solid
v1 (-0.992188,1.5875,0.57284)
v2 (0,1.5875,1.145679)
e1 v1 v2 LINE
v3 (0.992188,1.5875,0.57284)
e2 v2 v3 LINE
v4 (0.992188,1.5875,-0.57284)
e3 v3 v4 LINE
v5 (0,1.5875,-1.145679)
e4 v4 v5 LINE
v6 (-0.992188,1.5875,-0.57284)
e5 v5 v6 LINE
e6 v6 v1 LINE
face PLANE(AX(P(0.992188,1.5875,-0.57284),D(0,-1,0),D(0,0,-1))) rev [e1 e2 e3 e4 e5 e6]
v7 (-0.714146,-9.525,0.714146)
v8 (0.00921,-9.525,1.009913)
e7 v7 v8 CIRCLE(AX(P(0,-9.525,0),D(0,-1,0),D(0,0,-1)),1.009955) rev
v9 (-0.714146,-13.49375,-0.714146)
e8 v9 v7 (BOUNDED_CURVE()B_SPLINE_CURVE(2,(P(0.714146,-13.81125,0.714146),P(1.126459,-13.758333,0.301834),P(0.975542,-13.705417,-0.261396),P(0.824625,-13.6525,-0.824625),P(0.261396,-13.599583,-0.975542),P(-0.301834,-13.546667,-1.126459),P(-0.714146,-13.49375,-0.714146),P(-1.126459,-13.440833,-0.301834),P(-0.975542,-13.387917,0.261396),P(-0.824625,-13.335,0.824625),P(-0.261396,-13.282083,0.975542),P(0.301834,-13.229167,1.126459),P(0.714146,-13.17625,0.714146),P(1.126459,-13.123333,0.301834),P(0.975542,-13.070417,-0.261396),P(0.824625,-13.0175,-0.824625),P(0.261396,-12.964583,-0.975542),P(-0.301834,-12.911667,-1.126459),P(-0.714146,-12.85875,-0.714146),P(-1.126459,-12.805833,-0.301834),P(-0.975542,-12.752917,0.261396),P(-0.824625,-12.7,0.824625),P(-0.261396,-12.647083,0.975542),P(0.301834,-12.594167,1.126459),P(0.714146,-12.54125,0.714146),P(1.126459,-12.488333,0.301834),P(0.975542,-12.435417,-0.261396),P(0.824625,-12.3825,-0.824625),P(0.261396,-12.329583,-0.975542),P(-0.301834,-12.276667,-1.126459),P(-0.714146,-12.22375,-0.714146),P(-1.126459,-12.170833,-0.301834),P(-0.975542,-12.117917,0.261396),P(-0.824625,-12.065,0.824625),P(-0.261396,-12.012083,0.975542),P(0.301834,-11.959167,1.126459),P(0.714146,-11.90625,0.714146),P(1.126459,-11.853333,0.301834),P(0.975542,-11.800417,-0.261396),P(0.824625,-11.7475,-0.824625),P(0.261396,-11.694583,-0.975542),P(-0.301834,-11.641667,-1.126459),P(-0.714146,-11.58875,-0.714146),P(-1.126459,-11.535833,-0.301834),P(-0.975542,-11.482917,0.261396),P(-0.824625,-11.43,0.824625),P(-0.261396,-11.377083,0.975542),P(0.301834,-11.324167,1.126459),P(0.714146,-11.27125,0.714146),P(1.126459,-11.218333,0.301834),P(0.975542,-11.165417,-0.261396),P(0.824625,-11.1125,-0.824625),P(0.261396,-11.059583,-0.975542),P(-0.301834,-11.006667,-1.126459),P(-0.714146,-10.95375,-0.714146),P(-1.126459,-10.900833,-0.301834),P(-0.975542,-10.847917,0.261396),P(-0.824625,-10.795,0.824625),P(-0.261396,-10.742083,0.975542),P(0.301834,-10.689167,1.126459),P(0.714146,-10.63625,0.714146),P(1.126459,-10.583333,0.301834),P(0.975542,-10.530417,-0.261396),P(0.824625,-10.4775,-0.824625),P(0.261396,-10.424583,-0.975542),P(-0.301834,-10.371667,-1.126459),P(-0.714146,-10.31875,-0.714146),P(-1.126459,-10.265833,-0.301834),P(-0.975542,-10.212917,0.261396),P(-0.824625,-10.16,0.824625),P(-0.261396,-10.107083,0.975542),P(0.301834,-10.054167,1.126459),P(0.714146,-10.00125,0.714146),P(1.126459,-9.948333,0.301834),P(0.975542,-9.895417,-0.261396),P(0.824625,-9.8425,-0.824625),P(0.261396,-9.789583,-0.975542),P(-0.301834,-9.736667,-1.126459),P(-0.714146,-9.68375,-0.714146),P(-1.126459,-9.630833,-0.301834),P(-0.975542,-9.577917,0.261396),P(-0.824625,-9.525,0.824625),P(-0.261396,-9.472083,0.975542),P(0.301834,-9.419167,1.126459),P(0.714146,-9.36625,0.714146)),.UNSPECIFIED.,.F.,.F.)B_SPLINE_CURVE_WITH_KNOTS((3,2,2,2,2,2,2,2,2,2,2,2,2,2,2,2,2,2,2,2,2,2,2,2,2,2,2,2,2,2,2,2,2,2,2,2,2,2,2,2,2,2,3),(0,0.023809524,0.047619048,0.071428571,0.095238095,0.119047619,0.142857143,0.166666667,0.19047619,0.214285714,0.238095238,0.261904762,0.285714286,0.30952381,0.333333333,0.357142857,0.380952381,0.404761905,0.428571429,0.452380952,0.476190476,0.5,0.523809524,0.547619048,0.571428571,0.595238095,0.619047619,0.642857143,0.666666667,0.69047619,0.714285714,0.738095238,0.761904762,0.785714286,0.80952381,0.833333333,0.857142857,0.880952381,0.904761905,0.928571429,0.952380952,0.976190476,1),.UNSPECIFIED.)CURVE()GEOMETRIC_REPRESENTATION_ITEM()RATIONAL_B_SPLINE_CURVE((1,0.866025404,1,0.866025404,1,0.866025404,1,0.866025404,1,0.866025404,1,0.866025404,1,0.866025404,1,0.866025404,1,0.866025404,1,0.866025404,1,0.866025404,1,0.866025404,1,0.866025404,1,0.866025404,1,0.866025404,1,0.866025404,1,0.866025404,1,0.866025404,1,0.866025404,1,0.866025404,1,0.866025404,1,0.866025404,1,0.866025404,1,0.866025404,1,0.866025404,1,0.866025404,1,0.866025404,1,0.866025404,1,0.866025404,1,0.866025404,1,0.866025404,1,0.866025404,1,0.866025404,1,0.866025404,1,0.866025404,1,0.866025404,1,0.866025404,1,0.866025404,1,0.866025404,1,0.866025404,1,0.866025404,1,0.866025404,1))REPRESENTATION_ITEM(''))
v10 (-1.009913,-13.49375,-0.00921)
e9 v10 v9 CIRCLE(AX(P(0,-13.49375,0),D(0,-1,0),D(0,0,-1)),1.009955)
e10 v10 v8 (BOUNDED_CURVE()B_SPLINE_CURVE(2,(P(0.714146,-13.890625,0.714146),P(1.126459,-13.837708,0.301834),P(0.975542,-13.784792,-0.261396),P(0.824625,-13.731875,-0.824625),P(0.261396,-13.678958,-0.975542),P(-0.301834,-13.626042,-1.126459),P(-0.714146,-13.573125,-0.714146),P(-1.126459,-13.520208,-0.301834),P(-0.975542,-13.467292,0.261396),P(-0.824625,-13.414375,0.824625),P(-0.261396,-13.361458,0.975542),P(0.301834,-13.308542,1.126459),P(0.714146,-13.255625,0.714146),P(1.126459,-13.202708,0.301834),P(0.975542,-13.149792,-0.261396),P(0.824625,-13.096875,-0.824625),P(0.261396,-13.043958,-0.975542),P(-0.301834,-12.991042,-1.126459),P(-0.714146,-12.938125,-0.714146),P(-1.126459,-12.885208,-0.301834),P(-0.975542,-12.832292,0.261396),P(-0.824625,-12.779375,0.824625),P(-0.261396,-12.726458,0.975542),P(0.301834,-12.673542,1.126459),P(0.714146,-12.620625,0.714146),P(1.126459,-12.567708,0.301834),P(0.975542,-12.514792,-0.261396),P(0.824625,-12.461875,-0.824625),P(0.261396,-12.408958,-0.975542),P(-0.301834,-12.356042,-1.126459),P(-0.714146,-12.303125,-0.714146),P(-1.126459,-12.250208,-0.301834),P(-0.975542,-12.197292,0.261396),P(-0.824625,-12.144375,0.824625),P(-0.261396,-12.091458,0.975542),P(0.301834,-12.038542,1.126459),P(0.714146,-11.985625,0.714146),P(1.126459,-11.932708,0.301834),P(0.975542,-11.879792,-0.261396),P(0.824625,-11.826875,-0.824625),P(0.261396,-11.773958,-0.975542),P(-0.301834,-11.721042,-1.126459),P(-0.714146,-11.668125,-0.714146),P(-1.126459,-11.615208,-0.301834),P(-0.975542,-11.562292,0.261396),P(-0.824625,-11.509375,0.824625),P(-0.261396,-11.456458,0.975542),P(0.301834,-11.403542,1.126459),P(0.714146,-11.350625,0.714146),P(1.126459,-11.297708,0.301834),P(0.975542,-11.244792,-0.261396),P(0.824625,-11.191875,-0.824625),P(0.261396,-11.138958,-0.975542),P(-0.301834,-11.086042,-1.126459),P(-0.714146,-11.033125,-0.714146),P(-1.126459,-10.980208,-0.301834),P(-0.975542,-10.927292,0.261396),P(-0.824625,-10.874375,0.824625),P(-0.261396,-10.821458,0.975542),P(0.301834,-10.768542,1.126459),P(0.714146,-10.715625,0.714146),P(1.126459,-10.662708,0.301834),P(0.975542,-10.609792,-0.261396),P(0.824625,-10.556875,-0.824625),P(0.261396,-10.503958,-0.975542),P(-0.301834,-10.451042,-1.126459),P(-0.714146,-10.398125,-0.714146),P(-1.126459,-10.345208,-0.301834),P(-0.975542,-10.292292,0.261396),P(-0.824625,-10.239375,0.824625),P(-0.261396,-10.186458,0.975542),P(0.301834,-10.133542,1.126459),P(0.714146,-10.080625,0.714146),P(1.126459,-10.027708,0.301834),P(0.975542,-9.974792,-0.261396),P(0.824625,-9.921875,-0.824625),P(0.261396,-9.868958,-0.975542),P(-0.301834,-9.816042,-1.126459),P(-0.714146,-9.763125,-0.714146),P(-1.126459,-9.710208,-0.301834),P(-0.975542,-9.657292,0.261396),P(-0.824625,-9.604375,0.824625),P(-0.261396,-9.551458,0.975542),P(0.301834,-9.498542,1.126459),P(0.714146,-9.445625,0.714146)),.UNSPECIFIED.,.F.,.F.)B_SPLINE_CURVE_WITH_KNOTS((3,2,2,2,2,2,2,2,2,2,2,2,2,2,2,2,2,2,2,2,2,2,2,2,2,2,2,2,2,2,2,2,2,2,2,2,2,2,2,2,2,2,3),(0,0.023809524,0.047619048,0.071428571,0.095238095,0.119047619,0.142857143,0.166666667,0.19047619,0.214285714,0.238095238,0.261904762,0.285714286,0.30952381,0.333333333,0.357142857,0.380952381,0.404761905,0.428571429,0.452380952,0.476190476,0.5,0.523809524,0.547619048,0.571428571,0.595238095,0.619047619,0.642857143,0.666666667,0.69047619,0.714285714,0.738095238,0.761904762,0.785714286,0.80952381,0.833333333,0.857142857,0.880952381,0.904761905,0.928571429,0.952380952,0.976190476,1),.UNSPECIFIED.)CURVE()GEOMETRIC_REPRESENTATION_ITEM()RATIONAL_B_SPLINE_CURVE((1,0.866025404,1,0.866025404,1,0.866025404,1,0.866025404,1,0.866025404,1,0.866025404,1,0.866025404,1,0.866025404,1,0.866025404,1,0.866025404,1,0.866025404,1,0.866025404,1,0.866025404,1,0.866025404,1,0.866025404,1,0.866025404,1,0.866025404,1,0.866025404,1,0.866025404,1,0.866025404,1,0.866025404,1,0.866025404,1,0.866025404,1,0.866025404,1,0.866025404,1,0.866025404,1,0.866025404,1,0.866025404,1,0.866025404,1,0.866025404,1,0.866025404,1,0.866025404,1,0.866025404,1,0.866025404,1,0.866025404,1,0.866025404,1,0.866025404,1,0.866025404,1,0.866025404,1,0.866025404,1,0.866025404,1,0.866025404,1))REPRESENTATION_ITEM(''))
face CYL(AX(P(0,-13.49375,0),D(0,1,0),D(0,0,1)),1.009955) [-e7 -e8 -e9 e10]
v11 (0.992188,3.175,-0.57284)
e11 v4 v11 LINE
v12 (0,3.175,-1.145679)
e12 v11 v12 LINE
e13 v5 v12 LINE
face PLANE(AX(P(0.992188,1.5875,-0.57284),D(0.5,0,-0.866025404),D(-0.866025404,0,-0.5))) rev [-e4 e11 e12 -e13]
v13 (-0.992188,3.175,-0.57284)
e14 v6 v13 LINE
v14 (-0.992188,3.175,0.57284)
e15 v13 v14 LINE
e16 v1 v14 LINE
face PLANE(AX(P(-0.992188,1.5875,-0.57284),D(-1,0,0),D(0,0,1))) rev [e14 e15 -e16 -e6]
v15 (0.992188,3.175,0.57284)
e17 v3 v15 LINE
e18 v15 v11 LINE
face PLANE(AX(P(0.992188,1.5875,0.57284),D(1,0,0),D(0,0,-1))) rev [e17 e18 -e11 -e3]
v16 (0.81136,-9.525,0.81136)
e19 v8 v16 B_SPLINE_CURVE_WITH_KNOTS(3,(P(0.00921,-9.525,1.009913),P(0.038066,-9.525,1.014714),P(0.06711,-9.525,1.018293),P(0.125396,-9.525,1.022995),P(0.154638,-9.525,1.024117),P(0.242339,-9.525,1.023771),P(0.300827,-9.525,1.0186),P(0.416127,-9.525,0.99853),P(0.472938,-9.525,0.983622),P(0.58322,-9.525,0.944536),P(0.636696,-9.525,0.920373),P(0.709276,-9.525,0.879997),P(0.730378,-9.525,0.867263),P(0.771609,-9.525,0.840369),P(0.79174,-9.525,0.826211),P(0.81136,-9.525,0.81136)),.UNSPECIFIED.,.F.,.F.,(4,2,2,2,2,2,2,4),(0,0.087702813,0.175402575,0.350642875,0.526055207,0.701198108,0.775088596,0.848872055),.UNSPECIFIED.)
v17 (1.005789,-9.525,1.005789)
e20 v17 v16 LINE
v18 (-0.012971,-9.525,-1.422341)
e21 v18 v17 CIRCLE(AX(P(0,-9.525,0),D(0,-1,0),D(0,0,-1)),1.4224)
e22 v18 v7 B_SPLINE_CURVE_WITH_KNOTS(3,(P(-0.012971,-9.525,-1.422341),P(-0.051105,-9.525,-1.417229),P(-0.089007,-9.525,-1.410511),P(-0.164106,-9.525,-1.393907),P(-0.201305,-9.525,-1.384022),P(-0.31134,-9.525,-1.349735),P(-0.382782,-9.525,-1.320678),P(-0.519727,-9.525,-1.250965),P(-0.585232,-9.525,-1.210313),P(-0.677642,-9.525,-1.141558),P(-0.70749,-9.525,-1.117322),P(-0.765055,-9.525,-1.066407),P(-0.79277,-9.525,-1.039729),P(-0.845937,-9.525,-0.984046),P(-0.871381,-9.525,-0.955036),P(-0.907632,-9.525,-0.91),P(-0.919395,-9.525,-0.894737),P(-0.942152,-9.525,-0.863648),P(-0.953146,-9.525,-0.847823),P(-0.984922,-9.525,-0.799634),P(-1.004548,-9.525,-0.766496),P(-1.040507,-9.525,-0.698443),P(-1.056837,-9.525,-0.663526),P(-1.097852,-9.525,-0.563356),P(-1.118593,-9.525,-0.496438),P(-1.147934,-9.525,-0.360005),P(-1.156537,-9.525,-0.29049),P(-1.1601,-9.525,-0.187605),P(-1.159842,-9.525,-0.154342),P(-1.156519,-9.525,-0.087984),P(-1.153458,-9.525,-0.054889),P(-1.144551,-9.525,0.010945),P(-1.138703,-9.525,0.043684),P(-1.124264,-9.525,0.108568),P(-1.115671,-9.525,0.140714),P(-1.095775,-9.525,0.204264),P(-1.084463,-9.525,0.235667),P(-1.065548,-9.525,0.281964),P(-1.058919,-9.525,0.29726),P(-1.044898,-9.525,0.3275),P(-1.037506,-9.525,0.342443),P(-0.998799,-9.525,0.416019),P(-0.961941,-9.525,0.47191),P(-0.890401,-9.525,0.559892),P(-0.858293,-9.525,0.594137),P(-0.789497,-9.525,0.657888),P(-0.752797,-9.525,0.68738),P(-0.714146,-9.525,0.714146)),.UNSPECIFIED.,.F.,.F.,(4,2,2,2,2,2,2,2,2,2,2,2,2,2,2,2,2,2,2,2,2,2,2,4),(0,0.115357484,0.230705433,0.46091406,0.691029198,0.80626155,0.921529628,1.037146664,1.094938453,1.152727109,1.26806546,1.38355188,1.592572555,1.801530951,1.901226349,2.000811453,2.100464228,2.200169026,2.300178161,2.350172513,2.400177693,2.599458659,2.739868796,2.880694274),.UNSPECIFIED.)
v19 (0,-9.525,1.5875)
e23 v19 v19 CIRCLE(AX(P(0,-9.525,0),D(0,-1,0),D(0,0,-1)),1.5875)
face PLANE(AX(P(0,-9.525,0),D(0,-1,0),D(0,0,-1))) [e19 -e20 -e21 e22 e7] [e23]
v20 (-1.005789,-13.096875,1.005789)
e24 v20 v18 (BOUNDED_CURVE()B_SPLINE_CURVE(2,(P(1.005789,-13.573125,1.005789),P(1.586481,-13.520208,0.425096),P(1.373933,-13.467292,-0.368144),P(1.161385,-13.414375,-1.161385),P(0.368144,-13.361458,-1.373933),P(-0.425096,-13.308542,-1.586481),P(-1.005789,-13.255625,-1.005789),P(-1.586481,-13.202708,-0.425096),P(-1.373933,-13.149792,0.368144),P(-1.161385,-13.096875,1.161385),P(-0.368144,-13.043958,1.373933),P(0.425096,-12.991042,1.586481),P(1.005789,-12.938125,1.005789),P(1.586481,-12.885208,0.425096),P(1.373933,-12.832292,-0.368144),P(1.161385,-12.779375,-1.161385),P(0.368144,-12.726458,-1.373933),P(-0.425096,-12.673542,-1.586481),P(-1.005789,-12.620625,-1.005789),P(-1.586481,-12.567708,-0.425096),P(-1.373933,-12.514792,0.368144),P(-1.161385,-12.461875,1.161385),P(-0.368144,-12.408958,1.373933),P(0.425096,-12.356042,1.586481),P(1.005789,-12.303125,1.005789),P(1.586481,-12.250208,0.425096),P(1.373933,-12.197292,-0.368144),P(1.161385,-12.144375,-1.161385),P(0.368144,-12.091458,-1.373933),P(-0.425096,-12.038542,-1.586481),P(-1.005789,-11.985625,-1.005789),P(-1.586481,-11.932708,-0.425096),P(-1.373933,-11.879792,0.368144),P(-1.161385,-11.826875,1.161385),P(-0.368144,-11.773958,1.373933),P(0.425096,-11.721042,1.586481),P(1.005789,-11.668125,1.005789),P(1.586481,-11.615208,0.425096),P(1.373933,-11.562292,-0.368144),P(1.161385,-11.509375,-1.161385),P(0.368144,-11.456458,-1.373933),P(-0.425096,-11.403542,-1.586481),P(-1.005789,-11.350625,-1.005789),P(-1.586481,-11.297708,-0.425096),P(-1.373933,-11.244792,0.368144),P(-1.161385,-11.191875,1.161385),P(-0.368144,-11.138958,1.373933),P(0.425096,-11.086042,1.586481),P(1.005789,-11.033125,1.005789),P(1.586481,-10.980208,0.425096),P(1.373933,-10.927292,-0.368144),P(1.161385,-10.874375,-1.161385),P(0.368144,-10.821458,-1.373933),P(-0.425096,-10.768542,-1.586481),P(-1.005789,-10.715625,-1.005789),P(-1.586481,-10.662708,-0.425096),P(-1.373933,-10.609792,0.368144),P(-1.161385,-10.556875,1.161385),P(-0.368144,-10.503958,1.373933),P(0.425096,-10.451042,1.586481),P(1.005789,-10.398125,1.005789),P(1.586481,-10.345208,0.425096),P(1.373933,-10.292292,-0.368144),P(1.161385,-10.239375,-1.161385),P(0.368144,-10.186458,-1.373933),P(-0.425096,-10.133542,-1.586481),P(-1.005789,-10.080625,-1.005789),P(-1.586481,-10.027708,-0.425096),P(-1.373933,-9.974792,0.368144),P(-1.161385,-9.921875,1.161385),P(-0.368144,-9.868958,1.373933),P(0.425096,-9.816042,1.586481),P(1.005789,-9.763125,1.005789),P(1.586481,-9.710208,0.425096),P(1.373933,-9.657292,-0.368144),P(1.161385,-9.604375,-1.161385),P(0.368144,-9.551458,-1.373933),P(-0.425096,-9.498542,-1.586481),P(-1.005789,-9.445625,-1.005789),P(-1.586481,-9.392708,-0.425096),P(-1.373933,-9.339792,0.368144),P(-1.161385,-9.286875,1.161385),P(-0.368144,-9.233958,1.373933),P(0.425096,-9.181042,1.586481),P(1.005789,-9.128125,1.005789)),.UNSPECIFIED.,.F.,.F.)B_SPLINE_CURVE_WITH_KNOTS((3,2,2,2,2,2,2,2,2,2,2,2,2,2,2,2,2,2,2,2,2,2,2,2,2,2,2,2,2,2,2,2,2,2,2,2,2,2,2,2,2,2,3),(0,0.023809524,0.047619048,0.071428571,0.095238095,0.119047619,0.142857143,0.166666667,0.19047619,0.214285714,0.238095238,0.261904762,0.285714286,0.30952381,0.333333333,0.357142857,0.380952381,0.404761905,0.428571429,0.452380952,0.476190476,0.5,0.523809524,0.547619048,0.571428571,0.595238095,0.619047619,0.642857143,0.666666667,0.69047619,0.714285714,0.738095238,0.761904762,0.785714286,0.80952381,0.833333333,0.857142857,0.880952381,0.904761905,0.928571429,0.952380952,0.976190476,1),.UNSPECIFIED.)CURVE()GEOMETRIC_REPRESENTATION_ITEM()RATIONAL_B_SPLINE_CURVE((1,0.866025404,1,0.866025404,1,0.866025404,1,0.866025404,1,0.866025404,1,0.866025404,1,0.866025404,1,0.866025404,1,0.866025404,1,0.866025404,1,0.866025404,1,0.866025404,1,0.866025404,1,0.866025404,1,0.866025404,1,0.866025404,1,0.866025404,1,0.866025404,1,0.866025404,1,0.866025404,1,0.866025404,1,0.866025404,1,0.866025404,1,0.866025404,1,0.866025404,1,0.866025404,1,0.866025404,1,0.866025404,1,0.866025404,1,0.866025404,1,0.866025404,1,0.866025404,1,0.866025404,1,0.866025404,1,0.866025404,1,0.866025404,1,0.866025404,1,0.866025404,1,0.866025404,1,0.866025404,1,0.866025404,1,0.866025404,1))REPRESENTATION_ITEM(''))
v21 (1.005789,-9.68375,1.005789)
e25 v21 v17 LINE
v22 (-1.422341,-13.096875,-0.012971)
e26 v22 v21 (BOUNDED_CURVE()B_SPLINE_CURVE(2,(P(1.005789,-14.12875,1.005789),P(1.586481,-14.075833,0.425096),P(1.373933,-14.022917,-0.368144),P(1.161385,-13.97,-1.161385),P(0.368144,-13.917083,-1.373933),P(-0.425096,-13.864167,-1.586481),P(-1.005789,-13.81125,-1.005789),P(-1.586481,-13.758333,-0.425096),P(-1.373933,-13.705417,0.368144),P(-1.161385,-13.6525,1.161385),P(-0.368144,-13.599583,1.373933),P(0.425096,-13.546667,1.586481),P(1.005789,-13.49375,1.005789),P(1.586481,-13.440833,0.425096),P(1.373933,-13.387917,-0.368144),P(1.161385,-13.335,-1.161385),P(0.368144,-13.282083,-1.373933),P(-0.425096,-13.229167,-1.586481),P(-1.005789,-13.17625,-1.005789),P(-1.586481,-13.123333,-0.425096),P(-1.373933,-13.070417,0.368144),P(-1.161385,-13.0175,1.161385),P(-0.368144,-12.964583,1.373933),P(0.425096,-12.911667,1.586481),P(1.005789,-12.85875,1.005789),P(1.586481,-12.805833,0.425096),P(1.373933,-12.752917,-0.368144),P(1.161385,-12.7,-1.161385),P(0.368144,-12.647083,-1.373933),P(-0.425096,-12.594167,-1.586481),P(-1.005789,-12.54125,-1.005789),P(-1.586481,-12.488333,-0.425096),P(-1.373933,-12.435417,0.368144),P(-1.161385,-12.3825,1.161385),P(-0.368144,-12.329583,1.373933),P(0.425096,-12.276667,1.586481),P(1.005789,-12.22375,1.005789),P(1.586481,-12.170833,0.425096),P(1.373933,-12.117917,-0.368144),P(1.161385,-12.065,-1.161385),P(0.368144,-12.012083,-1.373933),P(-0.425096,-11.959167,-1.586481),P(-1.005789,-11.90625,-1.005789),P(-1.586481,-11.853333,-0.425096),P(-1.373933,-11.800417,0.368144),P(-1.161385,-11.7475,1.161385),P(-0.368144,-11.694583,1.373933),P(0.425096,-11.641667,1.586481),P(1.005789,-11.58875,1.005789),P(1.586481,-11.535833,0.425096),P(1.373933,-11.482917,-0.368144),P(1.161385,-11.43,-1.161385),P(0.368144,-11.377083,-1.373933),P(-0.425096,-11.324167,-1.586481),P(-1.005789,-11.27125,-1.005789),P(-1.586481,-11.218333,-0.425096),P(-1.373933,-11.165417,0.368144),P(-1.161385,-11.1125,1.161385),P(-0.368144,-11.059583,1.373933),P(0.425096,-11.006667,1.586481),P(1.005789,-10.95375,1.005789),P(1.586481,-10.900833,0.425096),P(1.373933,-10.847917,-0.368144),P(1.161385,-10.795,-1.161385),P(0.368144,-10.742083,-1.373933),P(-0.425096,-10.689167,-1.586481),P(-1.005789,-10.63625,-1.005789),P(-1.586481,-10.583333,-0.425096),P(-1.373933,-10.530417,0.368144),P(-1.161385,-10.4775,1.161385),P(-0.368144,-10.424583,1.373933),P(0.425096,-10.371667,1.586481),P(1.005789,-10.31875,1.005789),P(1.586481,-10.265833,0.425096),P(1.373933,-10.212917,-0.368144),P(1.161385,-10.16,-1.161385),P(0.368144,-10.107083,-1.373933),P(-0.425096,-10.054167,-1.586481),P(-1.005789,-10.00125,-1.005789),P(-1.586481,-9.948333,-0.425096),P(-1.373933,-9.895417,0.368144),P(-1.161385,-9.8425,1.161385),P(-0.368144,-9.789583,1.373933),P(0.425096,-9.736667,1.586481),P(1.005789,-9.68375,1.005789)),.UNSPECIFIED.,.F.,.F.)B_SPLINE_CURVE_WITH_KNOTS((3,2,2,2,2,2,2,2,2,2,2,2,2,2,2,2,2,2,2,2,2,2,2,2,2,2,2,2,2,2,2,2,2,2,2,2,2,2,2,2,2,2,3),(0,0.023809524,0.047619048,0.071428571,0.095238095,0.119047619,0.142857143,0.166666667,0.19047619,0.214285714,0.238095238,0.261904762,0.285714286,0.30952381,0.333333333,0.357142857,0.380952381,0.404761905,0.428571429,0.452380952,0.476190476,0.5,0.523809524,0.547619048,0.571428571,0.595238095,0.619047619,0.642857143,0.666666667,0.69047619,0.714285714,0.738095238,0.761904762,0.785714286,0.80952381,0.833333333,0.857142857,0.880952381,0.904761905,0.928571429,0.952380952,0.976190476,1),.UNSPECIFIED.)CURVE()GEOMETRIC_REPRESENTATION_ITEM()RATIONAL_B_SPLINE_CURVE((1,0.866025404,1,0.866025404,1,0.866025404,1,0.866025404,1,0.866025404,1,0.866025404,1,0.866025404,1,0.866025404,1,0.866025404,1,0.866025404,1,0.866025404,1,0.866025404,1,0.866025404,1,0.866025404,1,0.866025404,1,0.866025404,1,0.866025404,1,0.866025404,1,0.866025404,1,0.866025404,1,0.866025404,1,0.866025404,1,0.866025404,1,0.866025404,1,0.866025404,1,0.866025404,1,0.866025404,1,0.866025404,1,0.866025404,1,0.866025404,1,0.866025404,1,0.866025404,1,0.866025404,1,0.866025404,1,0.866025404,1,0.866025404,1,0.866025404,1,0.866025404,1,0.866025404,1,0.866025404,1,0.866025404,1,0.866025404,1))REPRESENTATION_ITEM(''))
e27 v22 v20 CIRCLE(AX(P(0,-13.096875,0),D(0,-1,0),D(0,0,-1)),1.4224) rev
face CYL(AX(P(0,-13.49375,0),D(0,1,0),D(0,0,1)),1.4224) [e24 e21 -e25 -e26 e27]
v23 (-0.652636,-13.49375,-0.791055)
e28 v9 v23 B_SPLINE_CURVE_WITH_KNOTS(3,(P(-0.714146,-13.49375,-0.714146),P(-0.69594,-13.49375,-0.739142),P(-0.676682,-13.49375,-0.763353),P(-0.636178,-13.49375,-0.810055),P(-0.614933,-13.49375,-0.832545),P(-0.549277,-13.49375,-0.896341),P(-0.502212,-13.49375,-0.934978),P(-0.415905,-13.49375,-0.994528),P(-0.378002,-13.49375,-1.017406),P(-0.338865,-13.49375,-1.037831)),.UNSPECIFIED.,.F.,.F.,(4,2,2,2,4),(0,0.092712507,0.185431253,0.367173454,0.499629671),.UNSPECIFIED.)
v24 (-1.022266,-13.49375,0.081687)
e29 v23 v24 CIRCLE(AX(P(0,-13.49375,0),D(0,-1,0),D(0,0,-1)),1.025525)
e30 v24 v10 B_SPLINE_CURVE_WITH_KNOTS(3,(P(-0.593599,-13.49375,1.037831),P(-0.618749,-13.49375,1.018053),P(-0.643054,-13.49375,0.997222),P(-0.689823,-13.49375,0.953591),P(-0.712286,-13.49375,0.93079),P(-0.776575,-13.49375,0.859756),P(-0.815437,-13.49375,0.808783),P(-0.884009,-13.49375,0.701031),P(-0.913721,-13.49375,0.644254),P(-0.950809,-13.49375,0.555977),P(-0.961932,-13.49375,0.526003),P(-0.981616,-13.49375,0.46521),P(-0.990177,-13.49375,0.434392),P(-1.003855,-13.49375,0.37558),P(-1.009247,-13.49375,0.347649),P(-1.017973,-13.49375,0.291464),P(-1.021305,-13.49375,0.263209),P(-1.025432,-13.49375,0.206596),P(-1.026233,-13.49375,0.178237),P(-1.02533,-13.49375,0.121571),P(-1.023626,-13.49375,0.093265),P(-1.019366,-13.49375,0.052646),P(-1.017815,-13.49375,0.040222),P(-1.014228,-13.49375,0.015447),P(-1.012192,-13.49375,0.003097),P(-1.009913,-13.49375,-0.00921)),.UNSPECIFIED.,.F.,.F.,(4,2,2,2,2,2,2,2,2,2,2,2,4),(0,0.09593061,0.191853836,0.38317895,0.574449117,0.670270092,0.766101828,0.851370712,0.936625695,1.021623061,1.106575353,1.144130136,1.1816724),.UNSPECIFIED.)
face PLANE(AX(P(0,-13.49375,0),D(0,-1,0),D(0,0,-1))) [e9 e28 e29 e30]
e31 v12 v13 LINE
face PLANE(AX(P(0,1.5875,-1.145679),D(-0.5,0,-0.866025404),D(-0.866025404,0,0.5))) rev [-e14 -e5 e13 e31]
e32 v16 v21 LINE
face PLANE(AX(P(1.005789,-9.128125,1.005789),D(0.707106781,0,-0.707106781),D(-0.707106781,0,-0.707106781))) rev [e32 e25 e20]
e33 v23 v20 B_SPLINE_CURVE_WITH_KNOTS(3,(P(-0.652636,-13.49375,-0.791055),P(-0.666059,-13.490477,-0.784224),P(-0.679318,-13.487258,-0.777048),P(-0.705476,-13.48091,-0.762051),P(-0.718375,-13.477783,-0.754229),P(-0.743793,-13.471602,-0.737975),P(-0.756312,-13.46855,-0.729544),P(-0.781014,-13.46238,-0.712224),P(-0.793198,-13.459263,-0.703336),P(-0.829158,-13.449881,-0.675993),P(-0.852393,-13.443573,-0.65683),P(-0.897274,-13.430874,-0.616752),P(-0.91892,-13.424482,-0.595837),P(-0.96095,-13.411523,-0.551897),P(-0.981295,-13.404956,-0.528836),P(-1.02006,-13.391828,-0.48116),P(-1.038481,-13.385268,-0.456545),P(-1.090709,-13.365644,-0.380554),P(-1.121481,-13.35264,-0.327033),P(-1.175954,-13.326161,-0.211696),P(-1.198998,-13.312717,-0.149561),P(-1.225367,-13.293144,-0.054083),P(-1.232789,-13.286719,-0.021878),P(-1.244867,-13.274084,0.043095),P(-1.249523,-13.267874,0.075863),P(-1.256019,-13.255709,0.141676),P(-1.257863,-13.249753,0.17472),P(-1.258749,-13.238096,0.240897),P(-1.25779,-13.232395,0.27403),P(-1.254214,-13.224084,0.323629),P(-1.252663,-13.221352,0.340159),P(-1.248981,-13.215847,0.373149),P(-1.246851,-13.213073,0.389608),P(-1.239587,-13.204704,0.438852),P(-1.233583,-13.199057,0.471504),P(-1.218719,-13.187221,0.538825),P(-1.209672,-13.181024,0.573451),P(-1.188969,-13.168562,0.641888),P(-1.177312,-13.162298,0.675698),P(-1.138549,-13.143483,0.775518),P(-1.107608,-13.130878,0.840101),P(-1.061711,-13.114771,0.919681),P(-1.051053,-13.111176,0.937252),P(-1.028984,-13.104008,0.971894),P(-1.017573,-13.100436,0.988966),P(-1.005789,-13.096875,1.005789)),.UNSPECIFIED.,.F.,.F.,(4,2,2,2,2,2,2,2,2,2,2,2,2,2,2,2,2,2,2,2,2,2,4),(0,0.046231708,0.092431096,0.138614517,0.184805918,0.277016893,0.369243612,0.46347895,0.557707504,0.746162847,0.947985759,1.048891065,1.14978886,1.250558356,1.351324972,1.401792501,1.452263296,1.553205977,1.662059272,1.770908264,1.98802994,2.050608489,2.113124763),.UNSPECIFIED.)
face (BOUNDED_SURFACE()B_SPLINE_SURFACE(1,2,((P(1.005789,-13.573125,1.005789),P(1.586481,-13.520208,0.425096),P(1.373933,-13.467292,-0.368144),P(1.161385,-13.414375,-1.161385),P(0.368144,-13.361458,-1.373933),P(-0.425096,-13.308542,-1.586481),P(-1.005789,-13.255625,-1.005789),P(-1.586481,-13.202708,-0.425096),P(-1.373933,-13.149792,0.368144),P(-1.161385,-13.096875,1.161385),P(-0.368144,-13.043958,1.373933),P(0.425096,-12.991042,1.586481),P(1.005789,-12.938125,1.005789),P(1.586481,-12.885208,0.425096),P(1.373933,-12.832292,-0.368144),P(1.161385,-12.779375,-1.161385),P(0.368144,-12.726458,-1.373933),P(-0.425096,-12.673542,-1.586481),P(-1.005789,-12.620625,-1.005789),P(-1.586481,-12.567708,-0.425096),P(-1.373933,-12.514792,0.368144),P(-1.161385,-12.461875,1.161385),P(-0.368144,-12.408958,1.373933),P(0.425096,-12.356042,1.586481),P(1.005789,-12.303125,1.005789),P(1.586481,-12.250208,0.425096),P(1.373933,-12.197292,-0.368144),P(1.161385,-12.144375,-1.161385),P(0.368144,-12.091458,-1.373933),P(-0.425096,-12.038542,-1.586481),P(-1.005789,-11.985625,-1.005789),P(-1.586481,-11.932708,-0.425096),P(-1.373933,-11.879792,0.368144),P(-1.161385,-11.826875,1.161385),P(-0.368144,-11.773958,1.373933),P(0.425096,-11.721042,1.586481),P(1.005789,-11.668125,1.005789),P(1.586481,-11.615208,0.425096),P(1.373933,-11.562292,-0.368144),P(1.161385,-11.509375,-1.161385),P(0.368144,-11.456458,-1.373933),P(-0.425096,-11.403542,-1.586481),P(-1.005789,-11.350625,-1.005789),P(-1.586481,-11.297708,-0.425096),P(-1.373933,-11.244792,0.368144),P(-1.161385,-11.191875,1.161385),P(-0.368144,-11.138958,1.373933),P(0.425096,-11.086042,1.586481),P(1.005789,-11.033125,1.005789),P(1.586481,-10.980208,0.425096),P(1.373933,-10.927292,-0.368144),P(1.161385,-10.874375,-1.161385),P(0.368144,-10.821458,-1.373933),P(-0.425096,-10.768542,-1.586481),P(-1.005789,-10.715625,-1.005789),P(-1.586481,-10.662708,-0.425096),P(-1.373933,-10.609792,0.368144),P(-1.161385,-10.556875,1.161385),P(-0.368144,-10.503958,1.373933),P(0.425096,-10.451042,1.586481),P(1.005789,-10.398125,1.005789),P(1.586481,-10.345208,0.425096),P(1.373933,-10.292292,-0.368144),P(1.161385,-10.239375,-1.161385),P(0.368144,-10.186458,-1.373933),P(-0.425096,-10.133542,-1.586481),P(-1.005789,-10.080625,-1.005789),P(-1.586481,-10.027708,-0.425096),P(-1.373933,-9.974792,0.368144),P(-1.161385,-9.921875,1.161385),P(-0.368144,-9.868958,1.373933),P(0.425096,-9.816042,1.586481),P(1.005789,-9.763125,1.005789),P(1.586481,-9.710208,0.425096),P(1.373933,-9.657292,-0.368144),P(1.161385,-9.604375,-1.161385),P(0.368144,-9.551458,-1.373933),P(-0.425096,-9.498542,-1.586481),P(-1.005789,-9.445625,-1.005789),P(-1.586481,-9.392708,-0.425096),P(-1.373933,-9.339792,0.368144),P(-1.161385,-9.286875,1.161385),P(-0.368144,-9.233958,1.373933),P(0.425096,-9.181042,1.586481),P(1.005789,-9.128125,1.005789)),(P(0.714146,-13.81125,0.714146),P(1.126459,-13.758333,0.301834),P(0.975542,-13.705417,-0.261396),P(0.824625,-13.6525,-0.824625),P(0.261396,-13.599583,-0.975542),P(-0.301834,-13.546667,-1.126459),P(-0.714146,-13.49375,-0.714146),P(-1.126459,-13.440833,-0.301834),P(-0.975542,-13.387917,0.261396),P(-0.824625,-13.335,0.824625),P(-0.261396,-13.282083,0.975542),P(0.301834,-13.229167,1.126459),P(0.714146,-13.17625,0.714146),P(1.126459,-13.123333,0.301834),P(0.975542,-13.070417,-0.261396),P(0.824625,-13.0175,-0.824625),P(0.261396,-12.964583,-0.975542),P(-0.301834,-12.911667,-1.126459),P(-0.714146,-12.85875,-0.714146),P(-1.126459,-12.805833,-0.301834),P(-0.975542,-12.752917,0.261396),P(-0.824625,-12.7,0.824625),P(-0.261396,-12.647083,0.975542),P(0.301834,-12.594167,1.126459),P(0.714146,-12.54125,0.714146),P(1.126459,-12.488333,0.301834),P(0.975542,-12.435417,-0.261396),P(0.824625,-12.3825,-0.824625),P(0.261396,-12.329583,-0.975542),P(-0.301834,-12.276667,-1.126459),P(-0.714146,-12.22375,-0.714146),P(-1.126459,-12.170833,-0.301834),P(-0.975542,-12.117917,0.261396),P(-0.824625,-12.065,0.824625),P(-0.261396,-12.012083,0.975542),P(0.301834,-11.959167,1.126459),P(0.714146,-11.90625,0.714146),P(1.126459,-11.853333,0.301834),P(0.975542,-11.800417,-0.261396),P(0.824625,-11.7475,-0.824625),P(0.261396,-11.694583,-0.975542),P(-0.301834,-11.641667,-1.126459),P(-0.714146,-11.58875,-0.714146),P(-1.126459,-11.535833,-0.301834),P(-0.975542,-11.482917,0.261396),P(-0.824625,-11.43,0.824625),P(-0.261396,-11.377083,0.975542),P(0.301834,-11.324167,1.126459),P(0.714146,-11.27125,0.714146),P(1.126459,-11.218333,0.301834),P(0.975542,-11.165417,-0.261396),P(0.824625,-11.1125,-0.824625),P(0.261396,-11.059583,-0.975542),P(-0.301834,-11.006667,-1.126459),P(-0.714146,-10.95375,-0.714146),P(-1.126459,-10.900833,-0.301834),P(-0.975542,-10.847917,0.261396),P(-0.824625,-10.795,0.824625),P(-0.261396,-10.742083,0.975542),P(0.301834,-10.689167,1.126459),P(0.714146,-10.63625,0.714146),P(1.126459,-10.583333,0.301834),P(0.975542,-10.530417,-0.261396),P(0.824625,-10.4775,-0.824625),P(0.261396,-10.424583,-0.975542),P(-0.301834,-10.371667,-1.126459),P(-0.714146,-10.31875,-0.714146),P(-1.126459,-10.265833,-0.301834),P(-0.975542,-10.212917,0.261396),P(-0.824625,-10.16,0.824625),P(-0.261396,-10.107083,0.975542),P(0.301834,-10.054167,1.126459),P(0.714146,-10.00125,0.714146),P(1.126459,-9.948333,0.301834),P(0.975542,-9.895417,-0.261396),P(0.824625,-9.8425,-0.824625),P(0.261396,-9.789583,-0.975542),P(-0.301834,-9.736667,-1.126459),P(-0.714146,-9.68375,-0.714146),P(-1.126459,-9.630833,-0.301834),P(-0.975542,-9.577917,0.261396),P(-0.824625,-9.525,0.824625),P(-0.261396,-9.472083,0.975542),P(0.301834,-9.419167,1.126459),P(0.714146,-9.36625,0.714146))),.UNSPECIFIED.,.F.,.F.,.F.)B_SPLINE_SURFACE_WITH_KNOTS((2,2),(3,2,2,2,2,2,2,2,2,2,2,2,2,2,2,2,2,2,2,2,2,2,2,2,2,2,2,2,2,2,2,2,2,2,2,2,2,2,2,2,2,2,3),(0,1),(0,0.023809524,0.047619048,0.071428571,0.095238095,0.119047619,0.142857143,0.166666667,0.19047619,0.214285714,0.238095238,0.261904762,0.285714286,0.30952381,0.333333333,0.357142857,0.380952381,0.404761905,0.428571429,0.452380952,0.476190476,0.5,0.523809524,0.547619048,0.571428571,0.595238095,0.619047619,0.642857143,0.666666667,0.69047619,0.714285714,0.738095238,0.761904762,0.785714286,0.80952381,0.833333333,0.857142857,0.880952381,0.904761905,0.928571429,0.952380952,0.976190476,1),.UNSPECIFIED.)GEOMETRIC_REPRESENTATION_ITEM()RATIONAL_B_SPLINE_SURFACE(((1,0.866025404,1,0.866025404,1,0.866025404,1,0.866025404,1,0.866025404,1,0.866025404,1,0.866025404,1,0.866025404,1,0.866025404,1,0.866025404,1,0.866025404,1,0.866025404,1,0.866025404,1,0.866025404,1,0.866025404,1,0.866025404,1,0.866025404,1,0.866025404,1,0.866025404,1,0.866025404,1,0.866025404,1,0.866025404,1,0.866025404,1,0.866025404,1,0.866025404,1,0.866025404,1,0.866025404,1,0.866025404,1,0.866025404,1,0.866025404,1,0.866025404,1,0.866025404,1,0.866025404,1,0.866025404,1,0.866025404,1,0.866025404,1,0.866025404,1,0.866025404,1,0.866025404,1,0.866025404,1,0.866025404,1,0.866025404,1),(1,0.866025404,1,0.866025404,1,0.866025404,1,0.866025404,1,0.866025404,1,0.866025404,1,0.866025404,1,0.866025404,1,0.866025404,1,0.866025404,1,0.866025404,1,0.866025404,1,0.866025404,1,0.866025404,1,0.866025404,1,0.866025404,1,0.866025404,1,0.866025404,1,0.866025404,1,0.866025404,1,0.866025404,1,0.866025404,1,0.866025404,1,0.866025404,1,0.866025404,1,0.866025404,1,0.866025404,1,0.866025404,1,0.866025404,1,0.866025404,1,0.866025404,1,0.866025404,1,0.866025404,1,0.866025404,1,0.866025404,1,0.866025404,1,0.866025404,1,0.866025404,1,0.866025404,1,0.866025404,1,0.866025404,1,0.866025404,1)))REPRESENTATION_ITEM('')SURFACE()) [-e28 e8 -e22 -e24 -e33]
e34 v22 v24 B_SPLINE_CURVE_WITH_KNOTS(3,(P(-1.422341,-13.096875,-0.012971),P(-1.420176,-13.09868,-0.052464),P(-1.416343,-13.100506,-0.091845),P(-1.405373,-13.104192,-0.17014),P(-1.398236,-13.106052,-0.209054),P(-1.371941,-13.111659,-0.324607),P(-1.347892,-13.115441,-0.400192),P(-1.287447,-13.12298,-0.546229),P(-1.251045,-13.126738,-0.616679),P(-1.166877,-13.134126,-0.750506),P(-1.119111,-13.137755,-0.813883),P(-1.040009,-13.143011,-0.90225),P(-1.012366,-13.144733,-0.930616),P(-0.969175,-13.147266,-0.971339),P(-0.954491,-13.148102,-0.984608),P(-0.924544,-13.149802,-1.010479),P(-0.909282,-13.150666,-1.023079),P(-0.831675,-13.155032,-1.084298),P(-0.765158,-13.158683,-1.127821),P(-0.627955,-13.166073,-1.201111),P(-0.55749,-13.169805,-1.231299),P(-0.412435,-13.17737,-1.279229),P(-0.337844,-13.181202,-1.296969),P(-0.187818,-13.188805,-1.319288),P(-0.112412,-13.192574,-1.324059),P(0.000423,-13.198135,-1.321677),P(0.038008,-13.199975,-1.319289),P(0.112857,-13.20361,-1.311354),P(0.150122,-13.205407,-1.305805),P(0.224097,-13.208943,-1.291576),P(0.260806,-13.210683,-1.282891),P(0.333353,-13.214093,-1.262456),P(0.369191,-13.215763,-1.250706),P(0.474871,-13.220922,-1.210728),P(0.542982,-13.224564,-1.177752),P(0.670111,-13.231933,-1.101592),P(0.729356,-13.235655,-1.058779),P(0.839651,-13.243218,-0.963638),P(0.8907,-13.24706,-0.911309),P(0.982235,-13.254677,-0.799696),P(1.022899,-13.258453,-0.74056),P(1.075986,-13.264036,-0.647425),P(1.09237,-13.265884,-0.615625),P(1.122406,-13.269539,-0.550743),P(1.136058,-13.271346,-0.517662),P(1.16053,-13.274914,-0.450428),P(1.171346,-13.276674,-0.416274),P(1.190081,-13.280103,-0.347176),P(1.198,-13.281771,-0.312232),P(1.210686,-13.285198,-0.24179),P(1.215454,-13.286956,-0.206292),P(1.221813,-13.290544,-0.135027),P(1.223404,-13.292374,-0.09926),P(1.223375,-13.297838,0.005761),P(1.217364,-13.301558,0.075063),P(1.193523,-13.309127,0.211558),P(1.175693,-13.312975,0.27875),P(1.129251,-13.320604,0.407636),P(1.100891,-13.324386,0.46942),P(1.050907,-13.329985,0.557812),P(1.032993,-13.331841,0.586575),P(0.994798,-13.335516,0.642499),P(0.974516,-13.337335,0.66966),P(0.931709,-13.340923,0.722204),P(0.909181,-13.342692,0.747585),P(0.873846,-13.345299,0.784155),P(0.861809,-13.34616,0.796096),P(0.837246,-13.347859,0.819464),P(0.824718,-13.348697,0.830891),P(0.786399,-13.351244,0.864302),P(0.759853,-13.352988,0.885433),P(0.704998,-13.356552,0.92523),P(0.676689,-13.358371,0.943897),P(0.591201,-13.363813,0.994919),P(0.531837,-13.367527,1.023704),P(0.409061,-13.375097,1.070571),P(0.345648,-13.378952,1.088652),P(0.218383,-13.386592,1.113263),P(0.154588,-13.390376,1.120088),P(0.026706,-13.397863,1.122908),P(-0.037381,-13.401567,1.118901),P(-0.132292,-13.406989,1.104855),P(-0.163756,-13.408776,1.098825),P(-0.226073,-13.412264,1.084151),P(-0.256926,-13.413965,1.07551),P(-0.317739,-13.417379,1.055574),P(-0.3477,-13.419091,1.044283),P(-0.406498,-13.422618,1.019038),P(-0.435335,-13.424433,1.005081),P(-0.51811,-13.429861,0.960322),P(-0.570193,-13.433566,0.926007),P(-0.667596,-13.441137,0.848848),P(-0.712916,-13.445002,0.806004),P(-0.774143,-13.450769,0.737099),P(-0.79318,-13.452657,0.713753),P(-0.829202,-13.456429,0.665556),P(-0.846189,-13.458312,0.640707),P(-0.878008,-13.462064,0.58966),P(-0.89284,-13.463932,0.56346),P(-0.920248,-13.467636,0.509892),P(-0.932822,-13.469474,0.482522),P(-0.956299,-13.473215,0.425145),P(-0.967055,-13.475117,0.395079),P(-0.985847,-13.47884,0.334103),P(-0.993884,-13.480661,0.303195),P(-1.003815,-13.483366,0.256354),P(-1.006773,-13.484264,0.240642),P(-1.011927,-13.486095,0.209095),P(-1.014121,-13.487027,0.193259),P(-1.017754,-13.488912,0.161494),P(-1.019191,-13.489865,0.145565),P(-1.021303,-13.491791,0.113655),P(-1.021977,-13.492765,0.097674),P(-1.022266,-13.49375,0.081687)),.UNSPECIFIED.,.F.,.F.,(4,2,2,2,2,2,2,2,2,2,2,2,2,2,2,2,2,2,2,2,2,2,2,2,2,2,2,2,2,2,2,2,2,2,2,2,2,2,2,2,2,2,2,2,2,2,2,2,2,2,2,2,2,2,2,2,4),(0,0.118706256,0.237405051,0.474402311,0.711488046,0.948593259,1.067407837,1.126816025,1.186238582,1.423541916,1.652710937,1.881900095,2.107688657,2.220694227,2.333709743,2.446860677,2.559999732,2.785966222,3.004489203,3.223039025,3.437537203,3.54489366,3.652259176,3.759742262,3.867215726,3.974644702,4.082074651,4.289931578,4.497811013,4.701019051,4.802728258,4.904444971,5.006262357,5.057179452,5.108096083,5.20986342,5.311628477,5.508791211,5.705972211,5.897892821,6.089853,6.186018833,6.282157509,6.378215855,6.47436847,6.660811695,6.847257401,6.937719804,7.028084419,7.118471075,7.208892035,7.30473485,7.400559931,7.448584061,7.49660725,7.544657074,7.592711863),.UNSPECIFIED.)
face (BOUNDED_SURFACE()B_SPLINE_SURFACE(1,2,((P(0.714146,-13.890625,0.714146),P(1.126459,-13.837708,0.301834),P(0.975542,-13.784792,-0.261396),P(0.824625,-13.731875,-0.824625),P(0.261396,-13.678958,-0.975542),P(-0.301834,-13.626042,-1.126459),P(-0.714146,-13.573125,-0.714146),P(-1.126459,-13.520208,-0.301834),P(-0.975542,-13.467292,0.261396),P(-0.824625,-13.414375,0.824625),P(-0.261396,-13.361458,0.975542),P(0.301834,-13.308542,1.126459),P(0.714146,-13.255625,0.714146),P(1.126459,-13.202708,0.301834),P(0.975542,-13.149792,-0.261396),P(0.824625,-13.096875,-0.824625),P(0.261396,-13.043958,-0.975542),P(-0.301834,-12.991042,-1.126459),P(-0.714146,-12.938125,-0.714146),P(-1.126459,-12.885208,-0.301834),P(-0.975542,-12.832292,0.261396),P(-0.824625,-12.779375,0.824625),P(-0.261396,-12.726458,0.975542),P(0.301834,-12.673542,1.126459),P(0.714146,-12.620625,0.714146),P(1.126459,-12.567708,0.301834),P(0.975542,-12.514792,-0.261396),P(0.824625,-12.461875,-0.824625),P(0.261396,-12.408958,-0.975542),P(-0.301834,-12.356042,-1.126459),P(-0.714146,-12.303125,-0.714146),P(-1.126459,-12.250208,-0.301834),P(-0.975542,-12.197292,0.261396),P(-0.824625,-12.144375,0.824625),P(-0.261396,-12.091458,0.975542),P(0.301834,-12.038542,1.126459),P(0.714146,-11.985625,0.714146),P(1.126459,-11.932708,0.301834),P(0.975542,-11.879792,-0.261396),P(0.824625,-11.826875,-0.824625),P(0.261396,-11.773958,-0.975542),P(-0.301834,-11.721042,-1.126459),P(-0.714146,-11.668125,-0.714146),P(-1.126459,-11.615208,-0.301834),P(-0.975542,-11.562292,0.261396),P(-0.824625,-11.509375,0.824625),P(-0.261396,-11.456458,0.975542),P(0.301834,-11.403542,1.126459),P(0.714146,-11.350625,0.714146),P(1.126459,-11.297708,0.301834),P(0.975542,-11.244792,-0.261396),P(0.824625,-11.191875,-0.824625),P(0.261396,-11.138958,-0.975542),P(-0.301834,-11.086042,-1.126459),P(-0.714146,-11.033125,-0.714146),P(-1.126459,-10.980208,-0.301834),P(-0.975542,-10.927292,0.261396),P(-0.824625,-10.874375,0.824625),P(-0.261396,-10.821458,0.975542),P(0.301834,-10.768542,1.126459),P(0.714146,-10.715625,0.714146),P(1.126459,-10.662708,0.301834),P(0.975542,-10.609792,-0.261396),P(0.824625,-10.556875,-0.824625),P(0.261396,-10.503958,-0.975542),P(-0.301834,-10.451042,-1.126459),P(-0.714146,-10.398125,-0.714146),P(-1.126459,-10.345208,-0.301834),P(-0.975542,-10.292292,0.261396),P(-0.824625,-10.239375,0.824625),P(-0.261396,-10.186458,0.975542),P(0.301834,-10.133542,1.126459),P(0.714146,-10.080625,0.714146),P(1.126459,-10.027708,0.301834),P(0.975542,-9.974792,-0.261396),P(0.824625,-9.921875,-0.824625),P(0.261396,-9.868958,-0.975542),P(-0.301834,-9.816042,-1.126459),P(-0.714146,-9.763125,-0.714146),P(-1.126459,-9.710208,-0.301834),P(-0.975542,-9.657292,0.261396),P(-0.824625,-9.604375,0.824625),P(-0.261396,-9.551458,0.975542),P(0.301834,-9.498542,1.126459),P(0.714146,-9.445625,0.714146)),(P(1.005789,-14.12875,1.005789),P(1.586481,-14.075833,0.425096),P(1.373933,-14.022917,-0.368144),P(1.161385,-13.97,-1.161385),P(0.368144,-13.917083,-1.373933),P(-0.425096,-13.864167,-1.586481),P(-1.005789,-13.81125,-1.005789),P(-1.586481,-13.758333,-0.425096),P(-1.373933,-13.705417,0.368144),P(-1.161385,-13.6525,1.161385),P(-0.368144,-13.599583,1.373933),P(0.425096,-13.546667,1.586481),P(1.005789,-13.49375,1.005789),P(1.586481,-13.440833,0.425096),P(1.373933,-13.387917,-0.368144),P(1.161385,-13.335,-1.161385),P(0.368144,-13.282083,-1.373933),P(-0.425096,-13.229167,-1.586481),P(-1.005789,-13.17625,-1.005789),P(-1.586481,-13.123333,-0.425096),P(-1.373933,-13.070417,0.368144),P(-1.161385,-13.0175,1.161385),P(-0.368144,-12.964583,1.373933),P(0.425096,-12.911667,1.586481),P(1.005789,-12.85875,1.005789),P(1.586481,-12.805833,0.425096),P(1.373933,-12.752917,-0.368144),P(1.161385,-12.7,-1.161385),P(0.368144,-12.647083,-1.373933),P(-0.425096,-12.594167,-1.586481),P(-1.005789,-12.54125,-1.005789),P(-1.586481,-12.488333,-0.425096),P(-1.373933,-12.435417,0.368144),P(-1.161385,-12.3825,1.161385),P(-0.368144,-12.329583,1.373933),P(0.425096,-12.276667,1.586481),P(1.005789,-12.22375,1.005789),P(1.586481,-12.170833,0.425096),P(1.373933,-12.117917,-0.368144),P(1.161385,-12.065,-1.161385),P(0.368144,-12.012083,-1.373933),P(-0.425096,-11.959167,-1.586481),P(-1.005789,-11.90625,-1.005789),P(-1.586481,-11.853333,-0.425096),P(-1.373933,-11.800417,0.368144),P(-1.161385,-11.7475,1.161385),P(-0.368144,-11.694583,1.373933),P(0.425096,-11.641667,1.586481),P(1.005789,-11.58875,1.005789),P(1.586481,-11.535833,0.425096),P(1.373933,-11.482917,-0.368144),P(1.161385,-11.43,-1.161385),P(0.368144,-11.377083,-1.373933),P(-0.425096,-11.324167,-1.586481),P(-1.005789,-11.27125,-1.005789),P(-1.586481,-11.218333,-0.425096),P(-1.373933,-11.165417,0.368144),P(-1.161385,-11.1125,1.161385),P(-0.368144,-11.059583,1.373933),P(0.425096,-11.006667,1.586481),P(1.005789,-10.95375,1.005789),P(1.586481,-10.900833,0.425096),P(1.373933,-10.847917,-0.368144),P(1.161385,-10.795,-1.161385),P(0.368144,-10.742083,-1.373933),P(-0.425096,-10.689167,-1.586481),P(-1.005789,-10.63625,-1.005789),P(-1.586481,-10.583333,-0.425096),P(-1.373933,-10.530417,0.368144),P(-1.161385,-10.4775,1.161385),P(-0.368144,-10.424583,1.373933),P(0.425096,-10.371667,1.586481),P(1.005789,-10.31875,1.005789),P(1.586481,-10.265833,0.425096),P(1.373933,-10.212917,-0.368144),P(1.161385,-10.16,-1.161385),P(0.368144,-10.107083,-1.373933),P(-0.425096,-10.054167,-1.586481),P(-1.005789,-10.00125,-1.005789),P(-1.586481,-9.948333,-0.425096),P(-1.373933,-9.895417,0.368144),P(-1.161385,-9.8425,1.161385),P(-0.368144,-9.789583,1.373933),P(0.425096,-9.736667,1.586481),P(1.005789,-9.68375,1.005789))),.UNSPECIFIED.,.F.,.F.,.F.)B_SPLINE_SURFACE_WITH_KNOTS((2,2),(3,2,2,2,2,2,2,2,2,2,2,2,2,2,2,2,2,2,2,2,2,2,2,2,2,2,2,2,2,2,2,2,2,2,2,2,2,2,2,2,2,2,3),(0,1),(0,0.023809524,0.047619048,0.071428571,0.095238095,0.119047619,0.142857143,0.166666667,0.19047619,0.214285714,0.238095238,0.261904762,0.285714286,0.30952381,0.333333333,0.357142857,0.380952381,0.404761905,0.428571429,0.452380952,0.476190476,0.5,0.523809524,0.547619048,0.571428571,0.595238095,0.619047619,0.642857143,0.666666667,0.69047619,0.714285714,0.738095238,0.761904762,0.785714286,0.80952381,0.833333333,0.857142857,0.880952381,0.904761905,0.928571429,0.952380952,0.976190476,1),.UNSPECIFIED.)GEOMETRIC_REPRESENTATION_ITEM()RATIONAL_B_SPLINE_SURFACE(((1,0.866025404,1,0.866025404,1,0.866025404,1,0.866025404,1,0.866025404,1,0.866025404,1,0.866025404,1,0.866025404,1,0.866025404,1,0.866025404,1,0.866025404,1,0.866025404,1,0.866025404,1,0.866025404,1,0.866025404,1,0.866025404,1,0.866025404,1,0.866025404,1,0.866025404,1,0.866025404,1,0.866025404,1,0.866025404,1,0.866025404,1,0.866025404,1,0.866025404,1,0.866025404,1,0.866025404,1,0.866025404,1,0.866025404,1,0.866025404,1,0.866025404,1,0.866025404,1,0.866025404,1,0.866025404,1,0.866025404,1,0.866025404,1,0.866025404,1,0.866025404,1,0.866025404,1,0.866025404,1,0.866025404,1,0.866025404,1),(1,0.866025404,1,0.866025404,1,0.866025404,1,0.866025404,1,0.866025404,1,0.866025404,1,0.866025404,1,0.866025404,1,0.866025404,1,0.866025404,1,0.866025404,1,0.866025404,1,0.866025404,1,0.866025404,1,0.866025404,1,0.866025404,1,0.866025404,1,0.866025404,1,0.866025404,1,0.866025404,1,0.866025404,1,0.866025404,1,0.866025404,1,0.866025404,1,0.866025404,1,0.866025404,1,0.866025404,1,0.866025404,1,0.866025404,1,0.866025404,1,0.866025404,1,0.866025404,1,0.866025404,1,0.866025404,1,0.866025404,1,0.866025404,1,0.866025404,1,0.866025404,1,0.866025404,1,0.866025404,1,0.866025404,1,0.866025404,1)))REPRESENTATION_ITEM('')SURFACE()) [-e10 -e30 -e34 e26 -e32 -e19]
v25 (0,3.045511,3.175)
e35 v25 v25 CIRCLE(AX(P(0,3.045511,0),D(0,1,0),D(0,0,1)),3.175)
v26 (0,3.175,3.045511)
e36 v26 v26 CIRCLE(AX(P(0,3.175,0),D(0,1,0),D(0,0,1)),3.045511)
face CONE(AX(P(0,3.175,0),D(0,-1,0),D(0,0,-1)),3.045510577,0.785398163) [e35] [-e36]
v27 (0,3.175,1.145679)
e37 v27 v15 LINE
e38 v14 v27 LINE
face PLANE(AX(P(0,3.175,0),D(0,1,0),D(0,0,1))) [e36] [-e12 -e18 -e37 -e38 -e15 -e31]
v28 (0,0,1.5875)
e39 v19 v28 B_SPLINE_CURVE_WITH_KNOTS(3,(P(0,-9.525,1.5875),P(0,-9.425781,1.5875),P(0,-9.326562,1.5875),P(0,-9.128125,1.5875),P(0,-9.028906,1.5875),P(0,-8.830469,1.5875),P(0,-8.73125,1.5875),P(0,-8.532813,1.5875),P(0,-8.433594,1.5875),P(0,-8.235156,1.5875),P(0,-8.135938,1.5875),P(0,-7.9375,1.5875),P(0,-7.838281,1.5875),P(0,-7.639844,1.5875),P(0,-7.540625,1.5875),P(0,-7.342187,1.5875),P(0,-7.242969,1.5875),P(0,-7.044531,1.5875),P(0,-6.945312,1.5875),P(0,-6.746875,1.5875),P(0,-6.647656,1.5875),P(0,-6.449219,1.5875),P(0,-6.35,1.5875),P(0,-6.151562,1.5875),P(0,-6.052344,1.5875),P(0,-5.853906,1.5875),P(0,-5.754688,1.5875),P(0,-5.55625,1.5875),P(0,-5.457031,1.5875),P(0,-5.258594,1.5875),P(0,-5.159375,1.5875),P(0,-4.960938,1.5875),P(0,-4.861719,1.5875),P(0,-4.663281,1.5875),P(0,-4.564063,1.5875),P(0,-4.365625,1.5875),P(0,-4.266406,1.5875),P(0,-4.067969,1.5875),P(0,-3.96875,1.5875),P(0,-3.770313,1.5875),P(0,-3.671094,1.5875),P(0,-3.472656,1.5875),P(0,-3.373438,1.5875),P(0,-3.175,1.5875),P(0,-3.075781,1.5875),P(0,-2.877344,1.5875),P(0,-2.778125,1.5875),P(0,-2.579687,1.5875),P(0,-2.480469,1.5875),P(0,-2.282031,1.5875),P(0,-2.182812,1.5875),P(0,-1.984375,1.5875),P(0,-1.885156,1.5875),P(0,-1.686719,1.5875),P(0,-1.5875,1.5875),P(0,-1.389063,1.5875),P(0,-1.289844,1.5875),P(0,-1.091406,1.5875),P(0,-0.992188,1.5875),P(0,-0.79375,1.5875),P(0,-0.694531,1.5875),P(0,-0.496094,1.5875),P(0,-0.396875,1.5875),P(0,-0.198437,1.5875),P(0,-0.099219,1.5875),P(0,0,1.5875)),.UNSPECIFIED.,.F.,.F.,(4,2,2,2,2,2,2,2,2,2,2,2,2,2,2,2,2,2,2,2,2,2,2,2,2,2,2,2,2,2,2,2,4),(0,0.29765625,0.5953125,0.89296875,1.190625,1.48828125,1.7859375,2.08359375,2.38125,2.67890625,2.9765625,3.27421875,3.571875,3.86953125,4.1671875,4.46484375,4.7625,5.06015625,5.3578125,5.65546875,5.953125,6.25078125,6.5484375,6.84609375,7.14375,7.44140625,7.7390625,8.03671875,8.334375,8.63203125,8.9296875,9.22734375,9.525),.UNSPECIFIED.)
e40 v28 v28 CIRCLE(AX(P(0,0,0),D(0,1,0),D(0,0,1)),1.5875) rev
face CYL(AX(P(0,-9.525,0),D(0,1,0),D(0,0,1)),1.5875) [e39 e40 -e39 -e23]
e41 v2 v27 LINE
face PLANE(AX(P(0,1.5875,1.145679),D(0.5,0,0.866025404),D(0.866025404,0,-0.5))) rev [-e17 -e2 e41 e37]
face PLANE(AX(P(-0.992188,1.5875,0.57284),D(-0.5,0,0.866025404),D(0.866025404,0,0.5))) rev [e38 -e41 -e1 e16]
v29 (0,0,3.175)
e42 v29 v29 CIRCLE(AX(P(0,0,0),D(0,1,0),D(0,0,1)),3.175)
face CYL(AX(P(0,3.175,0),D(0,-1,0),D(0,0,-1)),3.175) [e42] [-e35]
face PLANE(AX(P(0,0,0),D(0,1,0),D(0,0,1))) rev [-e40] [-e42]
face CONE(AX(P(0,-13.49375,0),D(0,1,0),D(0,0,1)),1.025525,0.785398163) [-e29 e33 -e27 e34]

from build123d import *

# Parameters (mm, degrees)
SKETCH1_R          = 3.175
EXTRUDE1_DEPTH     = 3.175
CUT_EXTRUDE1_DEPTH = 1.5875
SKETCH4_R          = 1.5875
EXTRUDE2_DEPTH     = 9.525
SKETCH5_R          = 1.4224
EXTRUDE3_DEPTH     = 3.96875
CHAMFER1_SIZE      = 0.396875
CUT_SWEEP1_PITCH   = 0.635
CUT_SWEEP1_TO      = 3.96875


with BuildPart() as part:
    # Sketch1 → Extrude1 (new body)
    with BuildSketch(Plane(origin=(0, 0, 0), x_dir=(1, 0, 0), z_dir=(0, 1, 0))):
        with Locations(Location((0, 0, 0), (0, 0, 270))):
            Circle(SKETCH1_R)
    extrude(amount=EXTRUDE1_DEPTH)

    # Sketch2 → Cut-Extrude1 (cut)
    with BuildSketch(Plane(origin=(0, 3.175, 0), x_dir=(-1, 0, 0), z_dir=(0, 1, 0))):
        Polygon((0, -1.14567944), (0.9921875, -0.57283972), (0.9921875, 0.57283972), (0, 1.14567944), (-0.9921875, 0.57283972), (-0.9921875, -0.57283972), align=None)
    extrude(amount=-CUT_EXTRUDE1_DEPTH, mode=Mode.SUBTRACT)

    # Sketch4 → Extrude2 (add)
    with BuildSketch(Plane.XZ):
        with Locations(Location((0, 0, 0), (0, 0, 90))):
            Circle(SKETCH4_R)
    extrude(amount=EXTRUDE2_DEPTH)

    # Sketch5 → Extrude3 (add)
    with BuildSketch(Plane.XZ.offset(9.525)):
        with Locations(Location((0, 0, 0), (0, 0, 270))):
            Circle(SKETCH5_R)
    extrude(amount=EXTRUDE3_DEPTH)

    # Chamfer1
    chamfer1_edges = [part.edges().sort_by_distance(p)[0] for p in [
        (0, -13.49375, 1.4224),
    ]]
    chamfer(chamfer1_edges, length=CHAMFER1_SIZE)

    # Cut-Sweep1: arcs per turn and ends read off the stored shape
    # Cut-Sweep1: the profile of Sketch13 profile screwed along a right-hand helix through 7 turns, 6 arcs to a turn; built about Z, then put on its axis
    cut_sweep1_z = Axis((0, 0, 0), (0, 0, 1))
    cut_sweep1_corners = [(1.4227, 0, -0.079201795), (1.4227, 0, -0.635173205), (1.009955401, 0, -0.396875), (1.009955401, 0, -0.3175)]
    with BuildLine(mode=Mode.PRIVATE) as cut_sweep1_profile:
        Line(cut_sweep1_corners[0], cut_sweep1_corners[1])
        Line(cut_sweep1_corners[1], cut_sweep1_corners[2])
        Line(cut_sweep1_corners[2], cut_sweep1_corners[3])
        Line(cut_sweep1_corners[3], cut_sweep1_corners[0])
    cut_sweep1_cap = Face(cut_sweep1_profile.wire())
    cut_sweep1_turn_angles = [0, 30, 60, 90, 120, 150, 180, 210, 240, 270, 300, 330, 360]
    cut_sweep1_turn_weights = [1, 0.8660254037844387, 1, 0.8660254037844387, 1, 0.8660254037844387, 1, 0.8660254037844387, 1, 0.8660254037844387, 1, 0.8660254037844387, 1]
    cut_sweep1_turn_rails = [Edge.make_bspline([Vector(p[0], p[1], 0).rotate(cut_sweep1_z, cut_sweep1_turn_angles[k]) / cut_sweep1_turn_weights[k] + Vector(0, 0, p[2] + CUT_SWEEP1_PITCH * cut_sweep1_turn_angles[k] / 360) for k in range(13)], [0, 0, 0, 1, 1, 2, 2, 3, 3, 4, 4, 5, 5, 6, 6, 6], 2, cut_sweep1_turn_weights) for p in cut_sweep1_corners]
    cut_sweep1_turn_sides = [Face.make_surface_from_curves(cut_sweep1_turn_rails[p[0]], cut_sweep1_turn_rails[p[1]]) for p in [(0, 1), (1, 2), (2, 3), (3, 0)]]
    cut_sweep1 = Plane(origin=(0, -13.49375, 0), x_dir=(0.7071067811865438, 0, 0.7071067811865512), z_dir=(0, 1, 0)) * split(Solid(Shell([*[p.moved(Location((0, 0, CUT_SWEEP1_PITCH * i))) for i in range(7) for p in cut_sweep1_turn_sides], cut_sweep1_cap, cut_sweep1_cap.rotate(cut_sweep1_z, 2520).moved(Location((0, 0, CUT_SWEEP1_PITCH * 2520 / 360)))])), bisect_by=Plane.XY.offset(CUT_SWEEP1_TO), keep=Keep.BOTTOM, mode=Mode.PRIVATE)
    add(cut_sweep1, mode=Mode.SUBTRACT)

    # Sketch11 → Cut-Revolve7 (revolve, cut)
    with BuildSketch(Plane.XY, mode=Mode.PRIVATE) as cut_revolve7_sk:
        Polygon((3.175, 3.045510577), (3.045510577, 3.175), (3.175, 3.175), align=None)
    revolve(cut_revolve7_sk.sketch.rotate(Axis((0, 14.544175091, 0), (0, -1, 0)), 90), axis=Axis((0, 14.544175091, 0), (0, -1, 0)), mode=Mode.SUBTRACT)


solid = part.part
